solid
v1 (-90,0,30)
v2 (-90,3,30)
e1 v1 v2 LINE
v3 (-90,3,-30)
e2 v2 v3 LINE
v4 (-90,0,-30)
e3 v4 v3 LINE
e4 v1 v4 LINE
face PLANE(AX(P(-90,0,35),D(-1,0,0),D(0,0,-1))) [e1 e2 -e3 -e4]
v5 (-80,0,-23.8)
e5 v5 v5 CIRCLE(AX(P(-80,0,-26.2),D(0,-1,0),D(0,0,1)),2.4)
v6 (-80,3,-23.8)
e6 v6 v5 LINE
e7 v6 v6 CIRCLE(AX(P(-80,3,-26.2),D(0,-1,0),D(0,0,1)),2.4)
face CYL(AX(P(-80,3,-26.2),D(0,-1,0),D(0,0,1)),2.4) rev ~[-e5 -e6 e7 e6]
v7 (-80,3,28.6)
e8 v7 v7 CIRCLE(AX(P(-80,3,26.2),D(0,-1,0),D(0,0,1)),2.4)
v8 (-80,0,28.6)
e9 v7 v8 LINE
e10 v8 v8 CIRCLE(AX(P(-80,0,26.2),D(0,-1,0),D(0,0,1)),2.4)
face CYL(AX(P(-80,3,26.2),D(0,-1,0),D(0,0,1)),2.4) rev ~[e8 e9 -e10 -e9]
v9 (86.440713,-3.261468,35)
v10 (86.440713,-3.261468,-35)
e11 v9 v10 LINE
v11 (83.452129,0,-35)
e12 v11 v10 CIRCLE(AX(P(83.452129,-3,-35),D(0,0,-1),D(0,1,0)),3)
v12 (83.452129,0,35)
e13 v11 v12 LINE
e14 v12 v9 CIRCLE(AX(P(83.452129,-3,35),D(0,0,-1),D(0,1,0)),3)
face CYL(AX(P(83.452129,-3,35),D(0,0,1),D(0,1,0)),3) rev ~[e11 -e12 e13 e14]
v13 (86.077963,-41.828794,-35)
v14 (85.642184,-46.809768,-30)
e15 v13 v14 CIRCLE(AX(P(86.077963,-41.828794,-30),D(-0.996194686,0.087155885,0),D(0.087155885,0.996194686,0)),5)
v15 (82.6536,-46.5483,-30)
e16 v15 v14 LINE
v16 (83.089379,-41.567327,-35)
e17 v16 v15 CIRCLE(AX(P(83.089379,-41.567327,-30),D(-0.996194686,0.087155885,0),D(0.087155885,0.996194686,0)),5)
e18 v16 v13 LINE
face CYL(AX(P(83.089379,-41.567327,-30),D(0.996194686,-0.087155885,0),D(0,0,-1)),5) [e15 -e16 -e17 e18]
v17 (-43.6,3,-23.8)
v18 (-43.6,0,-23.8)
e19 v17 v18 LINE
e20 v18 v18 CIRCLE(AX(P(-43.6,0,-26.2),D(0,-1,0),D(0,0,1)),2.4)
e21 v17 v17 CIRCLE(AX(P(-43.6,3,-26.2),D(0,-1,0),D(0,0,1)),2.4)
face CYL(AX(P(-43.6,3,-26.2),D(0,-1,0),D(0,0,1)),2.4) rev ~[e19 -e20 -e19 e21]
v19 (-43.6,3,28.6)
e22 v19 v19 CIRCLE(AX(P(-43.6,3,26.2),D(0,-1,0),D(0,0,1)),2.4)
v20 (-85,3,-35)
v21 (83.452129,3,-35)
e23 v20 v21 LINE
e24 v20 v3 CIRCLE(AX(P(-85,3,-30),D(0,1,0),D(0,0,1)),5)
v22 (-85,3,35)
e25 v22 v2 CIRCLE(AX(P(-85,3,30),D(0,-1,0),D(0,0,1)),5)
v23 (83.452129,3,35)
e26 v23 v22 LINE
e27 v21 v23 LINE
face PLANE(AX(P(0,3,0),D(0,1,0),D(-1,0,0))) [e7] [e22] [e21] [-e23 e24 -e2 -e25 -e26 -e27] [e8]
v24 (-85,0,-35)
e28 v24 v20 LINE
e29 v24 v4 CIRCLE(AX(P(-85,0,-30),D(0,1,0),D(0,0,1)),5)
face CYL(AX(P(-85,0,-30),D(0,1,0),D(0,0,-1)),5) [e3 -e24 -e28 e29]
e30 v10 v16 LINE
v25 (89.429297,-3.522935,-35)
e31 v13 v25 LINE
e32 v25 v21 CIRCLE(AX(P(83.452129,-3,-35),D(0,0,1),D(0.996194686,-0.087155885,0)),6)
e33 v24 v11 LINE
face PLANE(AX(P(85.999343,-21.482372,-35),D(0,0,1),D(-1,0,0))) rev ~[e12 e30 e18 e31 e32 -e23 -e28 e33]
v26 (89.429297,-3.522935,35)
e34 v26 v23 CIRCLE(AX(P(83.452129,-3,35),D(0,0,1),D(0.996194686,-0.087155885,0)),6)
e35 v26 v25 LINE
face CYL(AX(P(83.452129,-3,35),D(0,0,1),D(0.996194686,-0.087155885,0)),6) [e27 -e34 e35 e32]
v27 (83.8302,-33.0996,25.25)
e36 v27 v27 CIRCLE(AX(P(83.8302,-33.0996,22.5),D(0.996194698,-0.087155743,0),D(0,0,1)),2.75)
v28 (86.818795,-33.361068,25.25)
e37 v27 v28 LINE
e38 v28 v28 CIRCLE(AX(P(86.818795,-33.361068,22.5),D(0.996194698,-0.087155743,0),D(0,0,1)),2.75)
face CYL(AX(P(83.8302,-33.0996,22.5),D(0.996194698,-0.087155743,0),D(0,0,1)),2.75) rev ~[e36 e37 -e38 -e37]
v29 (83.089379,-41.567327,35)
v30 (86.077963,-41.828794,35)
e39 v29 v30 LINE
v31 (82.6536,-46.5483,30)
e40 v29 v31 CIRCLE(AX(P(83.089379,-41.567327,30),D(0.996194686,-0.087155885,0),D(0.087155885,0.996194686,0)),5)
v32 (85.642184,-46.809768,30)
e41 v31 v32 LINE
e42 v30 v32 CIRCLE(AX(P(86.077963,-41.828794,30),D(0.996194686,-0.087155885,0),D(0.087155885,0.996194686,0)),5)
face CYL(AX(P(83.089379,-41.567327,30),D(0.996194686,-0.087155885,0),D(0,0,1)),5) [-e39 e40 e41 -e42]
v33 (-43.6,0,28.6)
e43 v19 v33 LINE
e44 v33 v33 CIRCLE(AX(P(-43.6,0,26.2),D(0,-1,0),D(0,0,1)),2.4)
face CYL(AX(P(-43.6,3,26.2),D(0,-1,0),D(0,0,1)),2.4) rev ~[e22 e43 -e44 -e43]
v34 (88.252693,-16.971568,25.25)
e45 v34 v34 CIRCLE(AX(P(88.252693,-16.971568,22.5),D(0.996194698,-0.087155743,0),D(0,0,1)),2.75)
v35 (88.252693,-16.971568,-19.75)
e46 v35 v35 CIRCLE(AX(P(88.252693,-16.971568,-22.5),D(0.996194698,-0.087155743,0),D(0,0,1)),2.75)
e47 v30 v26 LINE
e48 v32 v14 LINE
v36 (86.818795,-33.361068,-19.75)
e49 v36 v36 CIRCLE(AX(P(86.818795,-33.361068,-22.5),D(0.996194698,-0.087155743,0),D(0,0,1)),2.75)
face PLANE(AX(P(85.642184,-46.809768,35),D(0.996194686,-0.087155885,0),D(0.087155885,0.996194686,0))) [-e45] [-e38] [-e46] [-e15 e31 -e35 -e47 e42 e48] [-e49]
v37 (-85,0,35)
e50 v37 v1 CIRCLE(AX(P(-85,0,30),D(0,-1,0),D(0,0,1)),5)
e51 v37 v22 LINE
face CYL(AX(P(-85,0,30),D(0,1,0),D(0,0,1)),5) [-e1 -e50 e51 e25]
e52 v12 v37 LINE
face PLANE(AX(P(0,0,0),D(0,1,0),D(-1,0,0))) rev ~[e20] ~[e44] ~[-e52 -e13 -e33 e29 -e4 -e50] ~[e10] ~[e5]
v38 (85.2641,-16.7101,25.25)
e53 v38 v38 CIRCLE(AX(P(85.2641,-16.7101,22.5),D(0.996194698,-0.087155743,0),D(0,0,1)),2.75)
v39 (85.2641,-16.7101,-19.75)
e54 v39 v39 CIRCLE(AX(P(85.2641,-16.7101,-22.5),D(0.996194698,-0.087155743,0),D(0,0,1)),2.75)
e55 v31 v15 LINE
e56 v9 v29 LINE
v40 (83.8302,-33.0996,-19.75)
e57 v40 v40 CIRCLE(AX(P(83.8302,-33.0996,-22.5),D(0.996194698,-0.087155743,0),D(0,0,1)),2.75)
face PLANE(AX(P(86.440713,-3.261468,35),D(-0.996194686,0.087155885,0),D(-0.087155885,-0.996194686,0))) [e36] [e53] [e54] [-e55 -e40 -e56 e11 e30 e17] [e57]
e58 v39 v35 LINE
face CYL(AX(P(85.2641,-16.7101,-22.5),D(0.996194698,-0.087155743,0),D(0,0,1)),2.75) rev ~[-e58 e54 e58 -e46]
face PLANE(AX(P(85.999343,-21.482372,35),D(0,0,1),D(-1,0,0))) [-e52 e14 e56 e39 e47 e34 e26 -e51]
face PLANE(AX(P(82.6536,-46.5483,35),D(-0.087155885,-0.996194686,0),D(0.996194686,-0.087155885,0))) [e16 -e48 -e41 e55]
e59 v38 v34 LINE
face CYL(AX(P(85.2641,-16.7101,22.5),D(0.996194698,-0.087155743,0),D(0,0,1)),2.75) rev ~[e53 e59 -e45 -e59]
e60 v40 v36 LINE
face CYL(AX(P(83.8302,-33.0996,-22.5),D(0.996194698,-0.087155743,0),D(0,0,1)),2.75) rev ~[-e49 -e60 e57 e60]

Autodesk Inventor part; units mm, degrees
ref_plane "YZ Plane" through (0, 0, 0) normal (1, 0, 0) x (0, 1, 0)
ref_plane "XZ Plane" through (0, 0, 0) normal (0, 1, 0) x (-1, 0, 0)
ref_plane "XY Plane" through (0, 0, 0) normal (0, 0, 1) x (1, 0, 0)
sketch "Sketch1" plane through (0, 0, 0) normal (0, 1, 0) x (-1, 0, 0)
  line L0 (-90, 35) -> (90, 35)
  line L1 (90, 35) -> (90, -35)
  line L2 (90, -35) -> (-90, -35)
  line L3 (-90, -35) -> (-90, 35)
  line L4 (-90, 35) -> (90, -35) construction
  line L5 (90, 35) -> (-90, -35) construction
  point P0 (0, 0)
  dimension "d0" = 70
  dimension "d1" = 180
extrude "Plate1" add sketch "Sketch1" along normal blind 3
sketch "Sketch2" plane through (87.0114, 3.2615, 35) normal (0.9961947, -0.0871557, 0) x (0.0871557, 0.9961947, 0)
  line L0 (0, -70) -> (0, 0)
  line L1 (0, 0) -> (-50, 0)
  line L2 (-50, 0) -> (-50, -70)
  line L3 (-50, -70) -> (0, -70)
edge flange "Flange1" height 50 angle 95 thickness 3 bend radius 3 thickness toward (0.9961947, -0.0871557, 0) relief tear relief width 3 relief depth 1.5 edges at (90, 0, 0) wall of the first edge with corners at (87.0114, 3.2615, -35) (87.0114, 3.2615, 35) (82.6536, -46.5483, 35) (82.6536, -46.5483, -35)
bend "Bend1"
corner "Corner1"
sketch "Sketch3" plane through (0, 3, 0) normal (0, 1, 0) x (1, 0, 0)
  line L0 (-43.6, -26.2) -> (-80, -26.2) construction
  line L1 (-80, -26.2) -> (-80, 26.2) construction
  line L2 (-80, 26.2) -> (-43.6, 26.2) construction
  line L3 (-43.6, 26.2) -> (-43.6, -26.2) construction
  line L4 (-43.6, -26.2) -> (-80, 26.2) construction
  line L5 (-80, -26.2) -> (-43.6, 26.2) construction
  line L6 (-90, -35) -> (-90, 35) construction
  point P0 (0, 0)
  point P1 (-61.8, 0)
  dimension "d13" = 52.4
  dimension "d14" = 36.4
  dimension "d15" = 10
hole "Hole1" at (-80, 3, 26.2) at (-80, 3, -26.2) at (-43.6, 3, -26.2) at (-43.6, 3, 26.2) direction (0, -1, 0) diameter 4.8 end through all clearance for "Countersunk Flat Head Screw DIN EN ISO 2009" size "M4" standard "DIN"
sketch "Sketch4" plane through (82.6536, -46.5483, -35) normal (-0.9961947, 0.0871557, 0) x (0, 0, 1)
  line L0 (12.5, 13.5) -> (57.5, 13.5) construction
  line L1 (57.5, 13.5) -> (57.5, 29.9521) construction
  line L2 (57.5, 29.9521) -> (12.5, 29.9521) construction
  line L3 (12.5, 29.9521) -> (12.5, 13.5) construction
  line L4 (12.5, 13.5) -> (57.5, 29.9521) construction
  line L5 (57.5, 13.5) -> (12.5, 29.9521) construction
  line L6 (70, 43.4521) -> (0, 43.4521) construction
  line L7 (0, 43.4521) -> (0, 0) construction
  line L8 (0, 0) -> (70, 0) construction
  line L9 (70, 43.4521) -> (70, 0) construction
  circle A0 centre (57.5, 29.9521) radius 2.75
  line L10 (53.5346, 32.7021) -> (62.0591, 32.7021)
  point P0 (35, 39.1674)
  point P1 (35, 21.7261)
  point P2 (70, 21.7261)
  dimension "d23" = 0
  dimension "d24" = 70
  dimension "d25" = 45
  dimension "d26" = 13.5
  dimension "d27" = 16.4521
  dimension "d28" = 5.5
  dimension "d29" = 10.75
hole "Hole2" at (85.2641, -16.7101, -22.5) at (83.8302, -33.0996, -22.5) at (85.2641, -16.7101, 22.5) at (83.8302, -33.0996, 22.5) direction (0.9961947, -0.0871557, 0) diameter 5.5 end through all clearance for "Countersunk Flat Head Screw DIN EN ISO 2009" size "M5" standard "DIN"
fillet "Fillet1" radius 5 4 edges at (84.1479, -46.679, 35) (84.1479, -46.679, -35) (-90, 1.5, 35) (-90, 1.5, -35)
equation "\"d21\" = Thickness"
equation "\"d35\" = Thickness"
equation "\"d2\" = Thickness"
equation "\"d3\" = BendReliefWidth"
equation "\"d4\" = BendReliefDepth"
equation "\"d5\" = MinimumRemnant"
equation "\"d6\" = TransitionRadius"
equation "\"d9\" = BendRadius"
equation "\"d10\" = CornerReliefSize"
equation "\"d11\" = GapSize"
equation "\"d12\" = JacobiRadiusSize"
equation "\"BendRadius\" = Thickness"
equation "\"BendReliefWidth\" = Thickness"
equation "\"BendReliefDepth\" = 0.5 * Thickness"
equation "\"CornerReliefSize\" = 4 * Thickness"
equation "\"MinimumRemnant\" = 2 * Thickness"
equation "\"TransitionRadius\" = BendRadius"
equation "\"JacobiRadiusSize\" = BendRadius"
equation "\"GapSize\" = Thickness"
equation "\"Thickness\" = 3"
properties part number "26062025_2" material "AISI 304"
